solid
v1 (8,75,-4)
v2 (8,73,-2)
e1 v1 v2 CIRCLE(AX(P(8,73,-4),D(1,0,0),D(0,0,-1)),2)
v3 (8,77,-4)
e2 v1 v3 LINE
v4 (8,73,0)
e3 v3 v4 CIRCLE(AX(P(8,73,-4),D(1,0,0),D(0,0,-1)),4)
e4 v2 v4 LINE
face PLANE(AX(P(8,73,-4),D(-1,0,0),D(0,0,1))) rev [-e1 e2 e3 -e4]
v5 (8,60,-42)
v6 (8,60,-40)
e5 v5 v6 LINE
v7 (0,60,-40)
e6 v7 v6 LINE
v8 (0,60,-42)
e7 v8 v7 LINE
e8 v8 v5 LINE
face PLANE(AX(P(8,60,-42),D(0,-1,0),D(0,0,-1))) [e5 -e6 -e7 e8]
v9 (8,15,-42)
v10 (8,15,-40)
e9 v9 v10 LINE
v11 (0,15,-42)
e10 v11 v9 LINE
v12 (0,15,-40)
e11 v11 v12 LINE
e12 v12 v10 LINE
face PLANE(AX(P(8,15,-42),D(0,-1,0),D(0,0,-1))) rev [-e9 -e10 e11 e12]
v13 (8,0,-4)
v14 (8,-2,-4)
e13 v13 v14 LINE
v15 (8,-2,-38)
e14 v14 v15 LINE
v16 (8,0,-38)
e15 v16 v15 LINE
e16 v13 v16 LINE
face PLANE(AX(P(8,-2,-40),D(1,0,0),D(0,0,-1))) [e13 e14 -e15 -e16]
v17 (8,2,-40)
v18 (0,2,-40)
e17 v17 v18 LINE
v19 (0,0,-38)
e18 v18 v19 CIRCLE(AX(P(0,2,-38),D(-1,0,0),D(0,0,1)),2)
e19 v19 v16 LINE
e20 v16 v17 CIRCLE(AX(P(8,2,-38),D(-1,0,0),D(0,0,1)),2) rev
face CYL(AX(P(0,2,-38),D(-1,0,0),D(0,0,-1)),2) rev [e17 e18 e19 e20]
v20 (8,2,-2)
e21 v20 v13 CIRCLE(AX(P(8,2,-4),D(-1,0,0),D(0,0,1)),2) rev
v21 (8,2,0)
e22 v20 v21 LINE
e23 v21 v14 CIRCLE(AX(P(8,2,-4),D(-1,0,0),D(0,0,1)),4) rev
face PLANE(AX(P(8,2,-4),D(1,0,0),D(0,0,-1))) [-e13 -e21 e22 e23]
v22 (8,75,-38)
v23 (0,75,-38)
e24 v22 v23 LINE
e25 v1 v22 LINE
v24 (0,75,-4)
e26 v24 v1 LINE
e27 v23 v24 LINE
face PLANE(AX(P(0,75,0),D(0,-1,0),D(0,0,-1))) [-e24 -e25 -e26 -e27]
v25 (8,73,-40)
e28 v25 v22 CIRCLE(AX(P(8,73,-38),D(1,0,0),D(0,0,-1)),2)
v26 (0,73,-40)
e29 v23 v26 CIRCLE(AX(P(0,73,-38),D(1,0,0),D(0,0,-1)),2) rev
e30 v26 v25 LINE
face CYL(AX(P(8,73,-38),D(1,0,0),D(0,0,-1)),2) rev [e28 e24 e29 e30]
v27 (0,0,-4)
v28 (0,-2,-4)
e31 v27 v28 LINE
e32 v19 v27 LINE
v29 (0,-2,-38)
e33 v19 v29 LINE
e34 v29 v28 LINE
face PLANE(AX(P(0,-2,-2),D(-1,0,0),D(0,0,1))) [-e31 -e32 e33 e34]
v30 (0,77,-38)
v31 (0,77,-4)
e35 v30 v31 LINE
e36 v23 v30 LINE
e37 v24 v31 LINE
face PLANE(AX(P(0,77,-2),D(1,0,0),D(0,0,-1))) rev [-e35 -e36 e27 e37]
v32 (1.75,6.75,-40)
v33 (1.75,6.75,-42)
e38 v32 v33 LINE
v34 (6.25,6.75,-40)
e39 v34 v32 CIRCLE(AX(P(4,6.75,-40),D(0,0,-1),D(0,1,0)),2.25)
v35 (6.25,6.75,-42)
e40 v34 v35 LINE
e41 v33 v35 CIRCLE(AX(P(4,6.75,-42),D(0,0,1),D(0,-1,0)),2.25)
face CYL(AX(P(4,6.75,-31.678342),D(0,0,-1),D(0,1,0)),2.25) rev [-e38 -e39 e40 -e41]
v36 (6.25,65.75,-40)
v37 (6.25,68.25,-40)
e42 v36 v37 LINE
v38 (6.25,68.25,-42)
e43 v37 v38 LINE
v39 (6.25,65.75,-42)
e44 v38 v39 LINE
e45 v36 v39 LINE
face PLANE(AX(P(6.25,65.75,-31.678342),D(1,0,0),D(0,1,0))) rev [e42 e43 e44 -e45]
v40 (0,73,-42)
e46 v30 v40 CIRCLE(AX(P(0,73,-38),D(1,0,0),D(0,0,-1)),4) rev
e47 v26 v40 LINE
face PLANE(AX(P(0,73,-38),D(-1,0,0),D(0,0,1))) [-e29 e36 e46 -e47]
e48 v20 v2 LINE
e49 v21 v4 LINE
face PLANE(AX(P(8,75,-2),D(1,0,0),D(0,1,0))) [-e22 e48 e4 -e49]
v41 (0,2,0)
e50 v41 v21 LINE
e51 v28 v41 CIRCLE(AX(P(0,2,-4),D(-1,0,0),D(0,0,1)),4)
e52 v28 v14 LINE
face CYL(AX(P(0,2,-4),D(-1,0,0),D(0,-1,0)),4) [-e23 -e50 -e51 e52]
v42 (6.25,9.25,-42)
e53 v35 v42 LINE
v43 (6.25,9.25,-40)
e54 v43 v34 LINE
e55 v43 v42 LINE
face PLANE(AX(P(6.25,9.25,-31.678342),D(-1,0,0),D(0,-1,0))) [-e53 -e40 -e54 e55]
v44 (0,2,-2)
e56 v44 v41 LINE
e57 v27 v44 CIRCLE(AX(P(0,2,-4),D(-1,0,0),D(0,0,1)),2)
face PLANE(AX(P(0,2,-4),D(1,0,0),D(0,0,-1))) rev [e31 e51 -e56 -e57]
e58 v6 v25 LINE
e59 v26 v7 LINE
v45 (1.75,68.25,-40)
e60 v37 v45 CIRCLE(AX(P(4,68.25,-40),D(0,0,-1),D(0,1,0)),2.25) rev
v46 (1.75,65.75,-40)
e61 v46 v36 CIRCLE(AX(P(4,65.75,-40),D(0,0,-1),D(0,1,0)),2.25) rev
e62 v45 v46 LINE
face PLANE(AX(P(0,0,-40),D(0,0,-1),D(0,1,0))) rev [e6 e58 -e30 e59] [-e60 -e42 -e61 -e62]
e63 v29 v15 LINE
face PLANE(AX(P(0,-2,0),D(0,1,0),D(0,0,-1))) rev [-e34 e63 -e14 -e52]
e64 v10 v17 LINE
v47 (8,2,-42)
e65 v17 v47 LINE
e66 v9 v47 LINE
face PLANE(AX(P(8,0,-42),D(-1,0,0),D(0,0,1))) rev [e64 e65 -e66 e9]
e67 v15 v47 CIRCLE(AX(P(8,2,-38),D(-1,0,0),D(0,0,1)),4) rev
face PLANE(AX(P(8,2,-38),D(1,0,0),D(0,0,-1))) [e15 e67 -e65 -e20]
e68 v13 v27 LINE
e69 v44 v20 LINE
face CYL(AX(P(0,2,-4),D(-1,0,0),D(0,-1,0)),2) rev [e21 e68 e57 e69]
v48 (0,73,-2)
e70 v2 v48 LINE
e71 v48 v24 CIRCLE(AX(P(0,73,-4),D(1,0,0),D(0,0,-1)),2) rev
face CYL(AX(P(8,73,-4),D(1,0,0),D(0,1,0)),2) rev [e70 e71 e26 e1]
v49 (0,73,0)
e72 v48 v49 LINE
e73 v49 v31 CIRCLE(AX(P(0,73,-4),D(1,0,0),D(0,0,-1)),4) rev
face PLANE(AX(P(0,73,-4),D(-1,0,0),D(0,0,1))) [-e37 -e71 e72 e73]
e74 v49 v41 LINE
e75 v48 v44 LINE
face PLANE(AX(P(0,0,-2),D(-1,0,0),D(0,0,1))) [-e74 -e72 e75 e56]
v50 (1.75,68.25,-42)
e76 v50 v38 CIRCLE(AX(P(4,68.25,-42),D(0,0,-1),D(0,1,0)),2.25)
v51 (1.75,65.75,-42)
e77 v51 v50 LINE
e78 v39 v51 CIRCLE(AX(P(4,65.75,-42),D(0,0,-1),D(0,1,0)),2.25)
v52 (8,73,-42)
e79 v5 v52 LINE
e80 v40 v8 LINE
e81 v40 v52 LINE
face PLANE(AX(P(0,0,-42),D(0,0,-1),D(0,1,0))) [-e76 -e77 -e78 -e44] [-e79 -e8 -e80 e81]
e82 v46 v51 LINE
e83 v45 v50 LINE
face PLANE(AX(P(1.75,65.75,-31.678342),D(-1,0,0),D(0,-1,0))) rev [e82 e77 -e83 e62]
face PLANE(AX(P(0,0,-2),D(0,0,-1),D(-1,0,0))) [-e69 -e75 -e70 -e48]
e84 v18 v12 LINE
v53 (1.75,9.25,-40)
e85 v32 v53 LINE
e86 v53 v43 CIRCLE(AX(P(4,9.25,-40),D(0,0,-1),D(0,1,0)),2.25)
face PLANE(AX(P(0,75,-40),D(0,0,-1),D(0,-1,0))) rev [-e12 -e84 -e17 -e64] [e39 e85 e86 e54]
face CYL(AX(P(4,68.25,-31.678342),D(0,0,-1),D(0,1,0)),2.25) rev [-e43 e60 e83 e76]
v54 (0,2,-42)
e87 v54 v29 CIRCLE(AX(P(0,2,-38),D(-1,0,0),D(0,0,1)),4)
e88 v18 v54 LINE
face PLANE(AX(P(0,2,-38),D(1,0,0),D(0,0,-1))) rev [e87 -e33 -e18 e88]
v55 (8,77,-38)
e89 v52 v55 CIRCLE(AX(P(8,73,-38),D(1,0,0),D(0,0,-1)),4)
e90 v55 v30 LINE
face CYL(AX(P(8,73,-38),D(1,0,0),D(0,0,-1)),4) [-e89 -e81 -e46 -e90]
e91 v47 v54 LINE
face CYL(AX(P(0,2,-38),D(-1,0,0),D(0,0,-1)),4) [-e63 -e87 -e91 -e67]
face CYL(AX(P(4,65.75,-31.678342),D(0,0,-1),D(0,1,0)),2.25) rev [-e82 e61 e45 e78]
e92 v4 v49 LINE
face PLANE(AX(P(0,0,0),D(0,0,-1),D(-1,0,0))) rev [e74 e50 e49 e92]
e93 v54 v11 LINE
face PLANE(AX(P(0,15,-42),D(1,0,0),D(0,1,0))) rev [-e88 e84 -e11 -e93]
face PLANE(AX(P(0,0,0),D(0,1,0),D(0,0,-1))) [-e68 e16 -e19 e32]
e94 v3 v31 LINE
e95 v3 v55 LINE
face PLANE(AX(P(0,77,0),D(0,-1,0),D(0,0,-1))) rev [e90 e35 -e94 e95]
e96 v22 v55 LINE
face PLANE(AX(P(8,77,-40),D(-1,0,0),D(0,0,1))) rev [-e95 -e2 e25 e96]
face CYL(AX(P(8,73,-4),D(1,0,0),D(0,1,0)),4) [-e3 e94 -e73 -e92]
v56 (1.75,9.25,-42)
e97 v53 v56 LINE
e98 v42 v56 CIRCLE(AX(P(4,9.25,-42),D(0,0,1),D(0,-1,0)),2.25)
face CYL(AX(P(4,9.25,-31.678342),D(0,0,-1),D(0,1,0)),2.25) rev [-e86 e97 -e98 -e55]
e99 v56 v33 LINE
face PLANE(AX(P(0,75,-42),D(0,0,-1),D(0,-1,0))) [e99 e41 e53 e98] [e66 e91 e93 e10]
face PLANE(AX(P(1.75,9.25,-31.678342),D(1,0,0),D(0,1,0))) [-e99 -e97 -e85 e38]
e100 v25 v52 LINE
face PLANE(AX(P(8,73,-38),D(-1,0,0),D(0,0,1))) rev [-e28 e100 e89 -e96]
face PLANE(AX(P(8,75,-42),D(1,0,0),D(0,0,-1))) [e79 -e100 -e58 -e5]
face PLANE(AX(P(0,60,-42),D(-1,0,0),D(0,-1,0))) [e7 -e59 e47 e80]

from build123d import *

# Parameters (mm, degrees)
SKIZZE1_W                       = 8
SKIZZE1_H                       = 75
BASIS_BLECH1_DEPTH              = 2
KANTE_LASCHE3_STRIP_W           = 12
KANTE_LASCHE3_STRIP_H           = 2
KANTE_LASCHE3_STRIP_CUT_DEPTH   = 8
KANTE_LASCHE3_DEPTH             = 8
KANTE_LASCHE4_STRIP_W           = 12
KANTE_LASCHE4_STRIP_H           = 2
KANTE_LASCHE4_STRIP_CUT_DEPTH   = 8
KANTE_LASCHE4_DEPTH             = 8
SCHNITT_LINEAR_AUSTRAGEN1_DEPTH = 2


# Sheet-metal steps are written as plain solids
with BuildPart() as part:
    # Skizze1 → Basis-Blech1 (new body)
    with BuildSketch(Plane.XY):
        with Locations((4, 37.5)):
            Rectangle(SKIZZE1_W, SKIZZE1_H)
    extrude(amount=-BASIS_BLECH1_DEPTH)

    # Kante-Lasche3 strip (across the edge) → Kante-Lasche3 strip cut (cut)
    with BuildSketch(Plane(origin=(0, 75, -2), x_dir=(0, -1, 0), z_dir=(1, 0, 0))):
        with Locations((-4, -1)):
            Rectangle(KANTE_LASCHE3_STRIP_W, KANTE_LASCHE3_STRIP_H)
    kante_lasche3_strip_cut = extrude(amount=KANTE_LASCHE3_STRIP_CUT_DEPTH, mode=Mode.SUBTRACT)

    # Kante-Lasche3 section (across the edge) → Kante-Lasche3 (add)
    with BuildSketch(Plane(origin=(0, 75, -2), x_dir=(0, -1, 0), z_dir=(1, 0, 0))):
        with BuildLine():
            Line((-2, 2), (-2, 38))
            Line((-2, 38), (0, 38))
            Line((0, 38), (0, 2))
            ThreePointArc((0, 2), (0.585786438, 0.585786438), (2, 0))
            Line((2, 0), (2, -2))
            ThreePointArc((2, -2), (-0.828427125, -0.828427125), (-2, 2))
        make_face()
    kante_lasche3 = extrude(amount=KANTE_LASCHE3_DEPTH)

    # Kante-Lasche4 strip (across the edge) → Kante-Lasche4 strip cut (cut)
    with BuildSketch(Plane(origin=(0, 75, -40), x_dir=(0, 0, 1), z_dir=(1, 0, 0))):
        with Locations((-4, -1)):
            Rectangle(KANTE_LASCHE4_STRIP_W, KANTE_LASCHE4_STRIP_H)
    kante_lasche4_strip_cut = extrude(amount=KANTE_LASCHE4_STRIP_CUT_DEPTH, mode=Mode.SUBTRACT)

    # Kante-Lasche4 section (across the edge) → Kante-Lasche4 (add)
    with BuildSketch(Plane(origin=(0, 75, -40), x_dir=(0, 0, 1), z_dir=(1, 0, 0))):
        with BuildLine():
            Line((-2, 2), (-2, 15))
            Line((-2, 15), (0, 15))
            Line((0, 15), (0, 2))
            ThreePointArc((0, 2), (0.585786438, 0.585786438), (2, 0))
            Line((2, 0), (2, -2))
            ThreePointArc((2, -2), (-0.828427125, -0.828427125), (-2, 2))
        make_face()
    kante_lasche4 = extrude(amount=KANTE_LASCHE4_DEPTH)

    # Skizze23 → Schnitt-Linear austragen1 (cut)
    with BuildSketch(Plane(origin=(0, 0, -42), x_dir=(-1, 0, 0), z_dir=(0, 0, -1))):
        with BuildLine():
            Line((-6.25, 65.75), (-6.25, 68.25))
            ThreePointArc((-6.25, 68.25), (-4, 70.5), (-1.75, 68.25))
            Line((-1.75, 68.25), (-1.75, 65.75))
            ThreePointArc((-1.75, 65.75), (-4, 63.5), (-6.25, 65.75))
        make_face()
    schnitt_linear_austragen1 = extrude(amount=-SCHNITT_LINEAR_AUSTRAGEN1_DEPTH, mode=Mode.SUBTRACT)

    # Spiegeln1: Kante-Lasche3 strip cut, Kante-Lasche3, Kante-Lasche4 strip cut, Kante-Lasche4, Schnitt-Linear austragen1 across plane
    add(kante_lasche3_strip_cut.mirror(Plane(origin=(0, 37.5, 0), x_dir=(0, 0, 1), z_dir=(0, -1, 0))), mode=Mode.SUBTRACT)
    add(kante_lasche3.mirror(Plane(origin=(0, 37.5, 0), x_dir=(0, 0, 1), z_dir=(0, -1, 0))))
    add(kante_lasche4_strip_cut.mirror(Plane(origin=(0, 37.5, 0), x_dir=(0, 0, 1), z_dir=(0, -1, 0))), mode=Mode.SUBTRACT)
    add(kante_lasche4.mirror(Plane(origin=(0, 37.5, 0), x_dir=(0, 0, 1), z_dir=(0, -1, 0))))
    add(schnitt_linear_austragen1.mirror(Plane(origin=(0, 37.5, 0), x_dir=(0, 0, 1), z_dir=(0, -1, 0))), mode=Mode.SUBTRACT)


solid = part.part
